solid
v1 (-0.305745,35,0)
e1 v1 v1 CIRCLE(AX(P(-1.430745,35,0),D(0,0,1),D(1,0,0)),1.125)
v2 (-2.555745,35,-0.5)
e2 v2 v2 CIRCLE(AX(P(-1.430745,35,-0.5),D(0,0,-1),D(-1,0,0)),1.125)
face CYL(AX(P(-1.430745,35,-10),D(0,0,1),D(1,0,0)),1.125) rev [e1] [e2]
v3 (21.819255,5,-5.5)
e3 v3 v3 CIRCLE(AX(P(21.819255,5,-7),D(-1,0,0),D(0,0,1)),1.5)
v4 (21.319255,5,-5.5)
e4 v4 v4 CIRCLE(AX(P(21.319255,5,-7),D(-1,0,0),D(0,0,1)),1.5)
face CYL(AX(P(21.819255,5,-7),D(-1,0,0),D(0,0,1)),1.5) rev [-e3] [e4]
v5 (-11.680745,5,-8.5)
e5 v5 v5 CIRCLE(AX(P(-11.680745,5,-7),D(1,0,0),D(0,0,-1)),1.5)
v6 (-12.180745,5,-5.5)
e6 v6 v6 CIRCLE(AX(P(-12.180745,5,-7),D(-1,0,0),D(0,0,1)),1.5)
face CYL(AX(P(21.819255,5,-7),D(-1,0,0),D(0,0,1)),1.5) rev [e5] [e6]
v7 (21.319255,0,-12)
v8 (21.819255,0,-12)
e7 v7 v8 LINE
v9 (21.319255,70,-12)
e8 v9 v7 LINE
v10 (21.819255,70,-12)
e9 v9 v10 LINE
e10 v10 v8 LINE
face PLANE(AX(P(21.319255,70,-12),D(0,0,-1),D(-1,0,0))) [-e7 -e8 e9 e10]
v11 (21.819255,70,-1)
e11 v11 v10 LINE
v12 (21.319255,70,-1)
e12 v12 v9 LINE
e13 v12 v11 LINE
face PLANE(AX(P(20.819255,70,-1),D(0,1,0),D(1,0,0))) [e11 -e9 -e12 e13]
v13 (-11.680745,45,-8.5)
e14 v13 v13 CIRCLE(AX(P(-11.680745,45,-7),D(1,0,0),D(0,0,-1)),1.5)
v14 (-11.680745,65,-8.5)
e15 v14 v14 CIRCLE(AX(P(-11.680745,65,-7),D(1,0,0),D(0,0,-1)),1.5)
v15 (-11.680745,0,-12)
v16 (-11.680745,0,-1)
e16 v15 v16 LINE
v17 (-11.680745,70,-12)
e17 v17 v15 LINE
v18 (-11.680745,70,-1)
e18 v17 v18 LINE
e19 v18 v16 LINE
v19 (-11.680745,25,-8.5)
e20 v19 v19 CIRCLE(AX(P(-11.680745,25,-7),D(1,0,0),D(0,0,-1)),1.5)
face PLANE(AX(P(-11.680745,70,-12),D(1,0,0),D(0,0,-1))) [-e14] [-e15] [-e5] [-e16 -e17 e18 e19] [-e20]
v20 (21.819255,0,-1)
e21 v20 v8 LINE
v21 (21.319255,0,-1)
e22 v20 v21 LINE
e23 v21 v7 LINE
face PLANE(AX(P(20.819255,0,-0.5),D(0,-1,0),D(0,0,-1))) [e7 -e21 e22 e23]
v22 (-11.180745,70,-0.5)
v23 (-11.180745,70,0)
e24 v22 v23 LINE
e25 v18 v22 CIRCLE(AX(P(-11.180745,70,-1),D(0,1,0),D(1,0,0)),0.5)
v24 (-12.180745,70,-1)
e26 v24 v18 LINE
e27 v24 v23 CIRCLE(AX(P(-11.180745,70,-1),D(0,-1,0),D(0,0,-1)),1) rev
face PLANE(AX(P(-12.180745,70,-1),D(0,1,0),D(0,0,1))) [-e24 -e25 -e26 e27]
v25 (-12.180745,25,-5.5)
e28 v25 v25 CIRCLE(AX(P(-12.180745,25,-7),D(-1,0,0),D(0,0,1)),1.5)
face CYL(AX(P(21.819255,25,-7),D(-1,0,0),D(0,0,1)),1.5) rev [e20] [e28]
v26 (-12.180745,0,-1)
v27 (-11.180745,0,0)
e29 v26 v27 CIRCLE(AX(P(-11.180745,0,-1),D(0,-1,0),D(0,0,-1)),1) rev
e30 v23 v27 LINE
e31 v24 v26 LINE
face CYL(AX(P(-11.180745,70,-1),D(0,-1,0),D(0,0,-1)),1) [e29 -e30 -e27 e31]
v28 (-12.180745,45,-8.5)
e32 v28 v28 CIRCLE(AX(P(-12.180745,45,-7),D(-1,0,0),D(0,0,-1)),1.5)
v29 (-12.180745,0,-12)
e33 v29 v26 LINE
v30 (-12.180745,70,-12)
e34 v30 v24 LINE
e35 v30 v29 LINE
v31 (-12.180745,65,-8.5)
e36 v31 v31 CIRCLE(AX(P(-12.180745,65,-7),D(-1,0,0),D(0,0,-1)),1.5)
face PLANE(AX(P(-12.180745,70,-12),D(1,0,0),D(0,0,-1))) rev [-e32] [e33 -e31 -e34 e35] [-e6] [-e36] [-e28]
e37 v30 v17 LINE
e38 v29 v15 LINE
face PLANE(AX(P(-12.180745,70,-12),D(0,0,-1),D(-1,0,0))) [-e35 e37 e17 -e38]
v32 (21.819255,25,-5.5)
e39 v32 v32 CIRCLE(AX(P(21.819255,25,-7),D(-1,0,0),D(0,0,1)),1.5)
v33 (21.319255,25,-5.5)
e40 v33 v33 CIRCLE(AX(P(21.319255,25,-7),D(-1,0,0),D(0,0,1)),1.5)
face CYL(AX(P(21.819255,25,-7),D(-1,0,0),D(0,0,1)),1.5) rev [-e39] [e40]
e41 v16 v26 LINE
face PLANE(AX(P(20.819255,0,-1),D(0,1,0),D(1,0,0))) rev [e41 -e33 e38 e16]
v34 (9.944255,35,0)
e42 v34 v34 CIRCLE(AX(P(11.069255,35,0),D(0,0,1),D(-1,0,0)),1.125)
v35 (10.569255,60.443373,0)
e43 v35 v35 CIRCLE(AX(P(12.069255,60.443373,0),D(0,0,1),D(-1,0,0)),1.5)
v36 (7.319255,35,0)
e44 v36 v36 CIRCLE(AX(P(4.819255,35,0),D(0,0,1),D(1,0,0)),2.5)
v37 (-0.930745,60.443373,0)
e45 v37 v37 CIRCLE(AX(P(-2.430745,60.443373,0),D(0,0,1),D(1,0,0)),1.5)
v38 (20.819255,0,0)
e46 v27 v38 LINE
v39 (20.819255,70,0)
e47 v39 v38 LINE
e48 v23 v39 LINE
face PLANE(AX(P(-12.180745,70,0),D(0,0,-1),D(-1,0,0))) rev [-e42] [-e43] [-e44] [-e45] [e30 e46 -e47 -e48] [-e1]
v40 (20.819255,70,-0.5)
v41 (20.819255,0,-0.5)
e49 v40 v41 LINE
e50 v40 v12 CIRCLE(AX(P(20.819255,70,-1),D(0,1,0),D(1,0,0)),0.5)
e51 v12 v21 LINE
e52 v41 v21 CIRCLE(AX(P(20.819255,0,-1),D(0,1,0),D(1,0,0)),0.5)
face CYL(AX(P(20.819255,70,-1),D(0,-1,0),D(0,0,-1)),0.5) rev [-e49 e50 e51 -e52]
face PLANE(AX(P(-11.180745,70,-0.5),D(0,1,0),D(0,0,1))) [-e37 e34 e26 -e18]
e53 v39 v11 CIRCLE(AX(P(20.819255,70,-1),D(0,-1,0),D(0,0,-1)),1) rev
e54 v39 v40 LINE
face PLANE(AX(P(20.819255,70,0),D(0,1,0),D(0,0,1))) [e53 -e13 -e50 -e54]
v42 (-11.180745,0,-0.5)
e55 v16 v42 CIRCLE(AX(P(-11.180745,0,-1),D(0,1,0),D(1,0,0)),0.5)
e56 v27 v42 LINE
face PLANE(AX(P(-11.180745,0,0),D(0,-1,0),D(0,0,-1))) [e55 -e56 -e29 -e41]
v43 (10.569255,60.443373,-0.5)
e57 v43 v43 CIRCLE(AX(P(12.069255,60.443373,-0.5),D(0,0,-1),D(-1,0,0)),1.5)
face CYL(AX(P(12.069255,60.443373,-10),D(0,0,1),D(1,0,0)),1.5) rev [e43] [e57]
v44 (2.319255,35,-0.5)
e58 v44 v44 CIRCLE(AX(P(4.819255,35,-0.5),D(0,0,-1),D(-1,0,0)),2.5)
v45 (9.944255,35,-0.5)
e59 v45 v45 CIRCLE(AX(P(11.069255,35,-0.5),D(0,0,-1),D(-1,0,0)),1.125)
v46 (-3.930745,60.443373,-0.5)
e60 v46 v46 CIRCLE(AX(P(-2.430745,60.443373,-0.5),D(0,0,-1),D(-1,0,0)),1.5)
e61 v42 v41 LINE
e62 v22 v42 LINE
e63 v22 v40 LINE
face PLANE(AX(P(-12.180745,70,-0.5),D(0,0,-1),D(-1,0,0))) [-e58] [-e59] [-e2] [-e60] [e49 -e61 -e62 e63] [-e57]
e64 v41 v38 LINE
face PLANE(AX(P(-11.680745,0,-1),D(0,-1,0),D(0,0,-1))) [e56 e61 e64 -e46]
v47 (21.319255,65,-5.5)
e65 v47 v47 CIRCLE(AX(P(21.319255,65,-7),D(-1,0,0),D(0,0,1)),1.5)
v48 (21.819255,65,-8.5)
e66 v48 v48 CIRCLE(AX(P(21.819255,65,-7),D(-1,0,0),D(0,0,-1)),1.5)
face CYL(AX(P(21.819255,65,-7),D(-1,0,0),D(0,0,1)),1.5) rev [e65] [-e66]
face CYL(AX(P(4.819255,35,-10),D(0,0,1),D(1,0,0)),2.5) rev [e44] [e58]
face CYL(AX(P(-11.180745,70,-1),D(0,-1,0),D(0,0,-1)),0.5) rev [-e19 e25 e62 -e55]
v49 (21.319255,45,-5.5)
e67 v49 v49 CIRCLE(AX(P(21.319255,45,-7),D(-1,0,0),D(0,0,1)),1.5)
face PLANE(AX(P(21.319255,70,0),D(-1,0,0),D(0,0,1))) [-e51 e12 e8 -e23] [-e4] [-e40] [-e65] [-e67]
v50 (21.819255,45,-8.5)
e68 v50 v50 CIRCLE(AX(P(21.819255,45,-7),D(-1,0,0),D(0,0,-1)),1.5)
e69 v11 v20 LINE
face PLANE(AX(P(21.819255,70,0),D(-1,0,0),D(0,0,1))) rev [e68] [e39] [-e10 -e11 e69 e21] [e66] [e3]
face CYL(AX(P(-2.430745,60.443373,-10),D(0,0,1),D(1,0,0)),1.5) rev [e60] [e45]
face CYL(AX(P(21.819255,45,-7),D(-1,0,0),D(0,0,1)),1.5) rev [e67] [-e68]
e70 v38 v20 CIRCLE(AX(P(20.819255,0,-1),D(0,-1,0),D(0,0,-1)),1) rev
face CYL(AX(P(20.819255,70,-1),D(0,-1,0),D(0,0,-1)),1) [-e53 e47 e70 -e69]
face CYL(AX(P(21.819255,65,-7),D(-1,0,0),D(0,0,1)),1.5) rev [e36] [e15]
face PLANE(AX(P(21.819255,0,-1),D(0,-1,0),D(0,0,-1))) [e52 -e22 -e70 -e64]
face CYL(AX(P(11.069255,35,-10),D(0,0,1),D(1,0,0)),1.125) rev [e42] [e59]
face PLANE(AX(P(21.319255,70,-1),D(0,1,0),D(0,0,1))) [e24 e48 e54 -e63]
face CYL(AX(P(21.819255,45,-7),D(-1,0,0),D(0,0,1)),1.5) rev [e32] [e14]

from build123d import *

# Parameters (mm, degrees)
BRIDA_BASE1_DEPTH     = 70
CROQUIS5_R            = 2.5
CROQUIS5_R_2          = 1.125
CROQUIS5_R_3          = 1.5
CORTAR_EXTRUIR1_DEPTH = 10
CROQUIS6_R            = 1.5
CORTAR_EXTRUIR3_DEPTH = 79.74007874


# Sheet-metal steps are written as plain solids
with BuildPart() as part:
    # Croquis1 → Brida base1 (new body)
    with BuildSketch(Plane(origin=(0, 0, 0), x_dir=(1, 0, 0), z_dir=(0, 1, 0))):
        with BuildLine():
            Line((-12.180744501, 12), (-12.180744501, 1))
            ThreePointArc((-12.180744501, 1), (-11.887851282, 0.292893219), (-11.180744501, 0))
            Line((-11.180744501, 0), (20.819255499, 0))
            ThreePointArc((20.819255499, 0), (21.52636228, 0.292893219), (21.819255499, 1))
            Line((21.819255499, 1), (21.819255499, 12))
            Line((21.819255499, 12), (21.319255499, 12))
            Line((21.319255499, 12), (21.319255499, 1))
            ThreePointArc((21.319255499, 1), (21.17280889, 0.646446609), (20.819255499, 0.5))
            Line((20.819255499, 0.5), (-11.180744501, 0.5))
            ThreePointArc((-11.180744501, 0.5), (-11.534297891, 0.646446609), (-11.680744501, 1))
            Line((-11.680744501, 1), (-11.680744501, 12))
            Line((-11.680744501, 12), (-12.180744501, 12))
        make_face()
    extrude(amount=BRIDA_BASE1_DEPTH)

    # Croquis5 → Cortar-Extruir1 (cut)
    with BuildSketch(Plane.XY):
        with Locations((4.819255499, 35)):
            Circle(CROQUIS5_R)
        with Locations((-1.430744501, 35)):
            Circle(CROQUIS5_R_2)
        with Locations(Location((11.069255499, 35, 0), (0, 0, 180))):
            Circle(CROQUIS5_R_2)
        with Locations((-2.430744501, 60.4433725)):
            Circle(CROQUIS5_R_3)
        with Locations(Location((12.069255499, 60.4433725, 0), (0, 0, 180))):
            Circle(CROQUIS5_R_3)
    extrude(amount=-CORTAR_EXTRUIR1_DEPTH, mode=Mode.SUBTRACT)

    # Croquis6 → Cortar-Extruir3 (cut, through all)
    with BuildSketch(Plane.ZY.offset(12.180744501)):
        with Locations(Location((-7, 45, 0), (0, 0, 180))):
            Circle(CROQUIS6_R)
        with Locations((-7, 25)):
            Circle(CROQUIS6_R)
        with Locations((-7, 5)):
            Circle(CROQUIS6_R)
        with Locations(Location((-7, 65, 0), (0, 0, 180))):
            Circle(CROQUIS6_R)
    extrude(amount=-CORTAR_EXTRUIR3_DEPTH, mode=Mode.SUBTRACT)


solid = part.part
